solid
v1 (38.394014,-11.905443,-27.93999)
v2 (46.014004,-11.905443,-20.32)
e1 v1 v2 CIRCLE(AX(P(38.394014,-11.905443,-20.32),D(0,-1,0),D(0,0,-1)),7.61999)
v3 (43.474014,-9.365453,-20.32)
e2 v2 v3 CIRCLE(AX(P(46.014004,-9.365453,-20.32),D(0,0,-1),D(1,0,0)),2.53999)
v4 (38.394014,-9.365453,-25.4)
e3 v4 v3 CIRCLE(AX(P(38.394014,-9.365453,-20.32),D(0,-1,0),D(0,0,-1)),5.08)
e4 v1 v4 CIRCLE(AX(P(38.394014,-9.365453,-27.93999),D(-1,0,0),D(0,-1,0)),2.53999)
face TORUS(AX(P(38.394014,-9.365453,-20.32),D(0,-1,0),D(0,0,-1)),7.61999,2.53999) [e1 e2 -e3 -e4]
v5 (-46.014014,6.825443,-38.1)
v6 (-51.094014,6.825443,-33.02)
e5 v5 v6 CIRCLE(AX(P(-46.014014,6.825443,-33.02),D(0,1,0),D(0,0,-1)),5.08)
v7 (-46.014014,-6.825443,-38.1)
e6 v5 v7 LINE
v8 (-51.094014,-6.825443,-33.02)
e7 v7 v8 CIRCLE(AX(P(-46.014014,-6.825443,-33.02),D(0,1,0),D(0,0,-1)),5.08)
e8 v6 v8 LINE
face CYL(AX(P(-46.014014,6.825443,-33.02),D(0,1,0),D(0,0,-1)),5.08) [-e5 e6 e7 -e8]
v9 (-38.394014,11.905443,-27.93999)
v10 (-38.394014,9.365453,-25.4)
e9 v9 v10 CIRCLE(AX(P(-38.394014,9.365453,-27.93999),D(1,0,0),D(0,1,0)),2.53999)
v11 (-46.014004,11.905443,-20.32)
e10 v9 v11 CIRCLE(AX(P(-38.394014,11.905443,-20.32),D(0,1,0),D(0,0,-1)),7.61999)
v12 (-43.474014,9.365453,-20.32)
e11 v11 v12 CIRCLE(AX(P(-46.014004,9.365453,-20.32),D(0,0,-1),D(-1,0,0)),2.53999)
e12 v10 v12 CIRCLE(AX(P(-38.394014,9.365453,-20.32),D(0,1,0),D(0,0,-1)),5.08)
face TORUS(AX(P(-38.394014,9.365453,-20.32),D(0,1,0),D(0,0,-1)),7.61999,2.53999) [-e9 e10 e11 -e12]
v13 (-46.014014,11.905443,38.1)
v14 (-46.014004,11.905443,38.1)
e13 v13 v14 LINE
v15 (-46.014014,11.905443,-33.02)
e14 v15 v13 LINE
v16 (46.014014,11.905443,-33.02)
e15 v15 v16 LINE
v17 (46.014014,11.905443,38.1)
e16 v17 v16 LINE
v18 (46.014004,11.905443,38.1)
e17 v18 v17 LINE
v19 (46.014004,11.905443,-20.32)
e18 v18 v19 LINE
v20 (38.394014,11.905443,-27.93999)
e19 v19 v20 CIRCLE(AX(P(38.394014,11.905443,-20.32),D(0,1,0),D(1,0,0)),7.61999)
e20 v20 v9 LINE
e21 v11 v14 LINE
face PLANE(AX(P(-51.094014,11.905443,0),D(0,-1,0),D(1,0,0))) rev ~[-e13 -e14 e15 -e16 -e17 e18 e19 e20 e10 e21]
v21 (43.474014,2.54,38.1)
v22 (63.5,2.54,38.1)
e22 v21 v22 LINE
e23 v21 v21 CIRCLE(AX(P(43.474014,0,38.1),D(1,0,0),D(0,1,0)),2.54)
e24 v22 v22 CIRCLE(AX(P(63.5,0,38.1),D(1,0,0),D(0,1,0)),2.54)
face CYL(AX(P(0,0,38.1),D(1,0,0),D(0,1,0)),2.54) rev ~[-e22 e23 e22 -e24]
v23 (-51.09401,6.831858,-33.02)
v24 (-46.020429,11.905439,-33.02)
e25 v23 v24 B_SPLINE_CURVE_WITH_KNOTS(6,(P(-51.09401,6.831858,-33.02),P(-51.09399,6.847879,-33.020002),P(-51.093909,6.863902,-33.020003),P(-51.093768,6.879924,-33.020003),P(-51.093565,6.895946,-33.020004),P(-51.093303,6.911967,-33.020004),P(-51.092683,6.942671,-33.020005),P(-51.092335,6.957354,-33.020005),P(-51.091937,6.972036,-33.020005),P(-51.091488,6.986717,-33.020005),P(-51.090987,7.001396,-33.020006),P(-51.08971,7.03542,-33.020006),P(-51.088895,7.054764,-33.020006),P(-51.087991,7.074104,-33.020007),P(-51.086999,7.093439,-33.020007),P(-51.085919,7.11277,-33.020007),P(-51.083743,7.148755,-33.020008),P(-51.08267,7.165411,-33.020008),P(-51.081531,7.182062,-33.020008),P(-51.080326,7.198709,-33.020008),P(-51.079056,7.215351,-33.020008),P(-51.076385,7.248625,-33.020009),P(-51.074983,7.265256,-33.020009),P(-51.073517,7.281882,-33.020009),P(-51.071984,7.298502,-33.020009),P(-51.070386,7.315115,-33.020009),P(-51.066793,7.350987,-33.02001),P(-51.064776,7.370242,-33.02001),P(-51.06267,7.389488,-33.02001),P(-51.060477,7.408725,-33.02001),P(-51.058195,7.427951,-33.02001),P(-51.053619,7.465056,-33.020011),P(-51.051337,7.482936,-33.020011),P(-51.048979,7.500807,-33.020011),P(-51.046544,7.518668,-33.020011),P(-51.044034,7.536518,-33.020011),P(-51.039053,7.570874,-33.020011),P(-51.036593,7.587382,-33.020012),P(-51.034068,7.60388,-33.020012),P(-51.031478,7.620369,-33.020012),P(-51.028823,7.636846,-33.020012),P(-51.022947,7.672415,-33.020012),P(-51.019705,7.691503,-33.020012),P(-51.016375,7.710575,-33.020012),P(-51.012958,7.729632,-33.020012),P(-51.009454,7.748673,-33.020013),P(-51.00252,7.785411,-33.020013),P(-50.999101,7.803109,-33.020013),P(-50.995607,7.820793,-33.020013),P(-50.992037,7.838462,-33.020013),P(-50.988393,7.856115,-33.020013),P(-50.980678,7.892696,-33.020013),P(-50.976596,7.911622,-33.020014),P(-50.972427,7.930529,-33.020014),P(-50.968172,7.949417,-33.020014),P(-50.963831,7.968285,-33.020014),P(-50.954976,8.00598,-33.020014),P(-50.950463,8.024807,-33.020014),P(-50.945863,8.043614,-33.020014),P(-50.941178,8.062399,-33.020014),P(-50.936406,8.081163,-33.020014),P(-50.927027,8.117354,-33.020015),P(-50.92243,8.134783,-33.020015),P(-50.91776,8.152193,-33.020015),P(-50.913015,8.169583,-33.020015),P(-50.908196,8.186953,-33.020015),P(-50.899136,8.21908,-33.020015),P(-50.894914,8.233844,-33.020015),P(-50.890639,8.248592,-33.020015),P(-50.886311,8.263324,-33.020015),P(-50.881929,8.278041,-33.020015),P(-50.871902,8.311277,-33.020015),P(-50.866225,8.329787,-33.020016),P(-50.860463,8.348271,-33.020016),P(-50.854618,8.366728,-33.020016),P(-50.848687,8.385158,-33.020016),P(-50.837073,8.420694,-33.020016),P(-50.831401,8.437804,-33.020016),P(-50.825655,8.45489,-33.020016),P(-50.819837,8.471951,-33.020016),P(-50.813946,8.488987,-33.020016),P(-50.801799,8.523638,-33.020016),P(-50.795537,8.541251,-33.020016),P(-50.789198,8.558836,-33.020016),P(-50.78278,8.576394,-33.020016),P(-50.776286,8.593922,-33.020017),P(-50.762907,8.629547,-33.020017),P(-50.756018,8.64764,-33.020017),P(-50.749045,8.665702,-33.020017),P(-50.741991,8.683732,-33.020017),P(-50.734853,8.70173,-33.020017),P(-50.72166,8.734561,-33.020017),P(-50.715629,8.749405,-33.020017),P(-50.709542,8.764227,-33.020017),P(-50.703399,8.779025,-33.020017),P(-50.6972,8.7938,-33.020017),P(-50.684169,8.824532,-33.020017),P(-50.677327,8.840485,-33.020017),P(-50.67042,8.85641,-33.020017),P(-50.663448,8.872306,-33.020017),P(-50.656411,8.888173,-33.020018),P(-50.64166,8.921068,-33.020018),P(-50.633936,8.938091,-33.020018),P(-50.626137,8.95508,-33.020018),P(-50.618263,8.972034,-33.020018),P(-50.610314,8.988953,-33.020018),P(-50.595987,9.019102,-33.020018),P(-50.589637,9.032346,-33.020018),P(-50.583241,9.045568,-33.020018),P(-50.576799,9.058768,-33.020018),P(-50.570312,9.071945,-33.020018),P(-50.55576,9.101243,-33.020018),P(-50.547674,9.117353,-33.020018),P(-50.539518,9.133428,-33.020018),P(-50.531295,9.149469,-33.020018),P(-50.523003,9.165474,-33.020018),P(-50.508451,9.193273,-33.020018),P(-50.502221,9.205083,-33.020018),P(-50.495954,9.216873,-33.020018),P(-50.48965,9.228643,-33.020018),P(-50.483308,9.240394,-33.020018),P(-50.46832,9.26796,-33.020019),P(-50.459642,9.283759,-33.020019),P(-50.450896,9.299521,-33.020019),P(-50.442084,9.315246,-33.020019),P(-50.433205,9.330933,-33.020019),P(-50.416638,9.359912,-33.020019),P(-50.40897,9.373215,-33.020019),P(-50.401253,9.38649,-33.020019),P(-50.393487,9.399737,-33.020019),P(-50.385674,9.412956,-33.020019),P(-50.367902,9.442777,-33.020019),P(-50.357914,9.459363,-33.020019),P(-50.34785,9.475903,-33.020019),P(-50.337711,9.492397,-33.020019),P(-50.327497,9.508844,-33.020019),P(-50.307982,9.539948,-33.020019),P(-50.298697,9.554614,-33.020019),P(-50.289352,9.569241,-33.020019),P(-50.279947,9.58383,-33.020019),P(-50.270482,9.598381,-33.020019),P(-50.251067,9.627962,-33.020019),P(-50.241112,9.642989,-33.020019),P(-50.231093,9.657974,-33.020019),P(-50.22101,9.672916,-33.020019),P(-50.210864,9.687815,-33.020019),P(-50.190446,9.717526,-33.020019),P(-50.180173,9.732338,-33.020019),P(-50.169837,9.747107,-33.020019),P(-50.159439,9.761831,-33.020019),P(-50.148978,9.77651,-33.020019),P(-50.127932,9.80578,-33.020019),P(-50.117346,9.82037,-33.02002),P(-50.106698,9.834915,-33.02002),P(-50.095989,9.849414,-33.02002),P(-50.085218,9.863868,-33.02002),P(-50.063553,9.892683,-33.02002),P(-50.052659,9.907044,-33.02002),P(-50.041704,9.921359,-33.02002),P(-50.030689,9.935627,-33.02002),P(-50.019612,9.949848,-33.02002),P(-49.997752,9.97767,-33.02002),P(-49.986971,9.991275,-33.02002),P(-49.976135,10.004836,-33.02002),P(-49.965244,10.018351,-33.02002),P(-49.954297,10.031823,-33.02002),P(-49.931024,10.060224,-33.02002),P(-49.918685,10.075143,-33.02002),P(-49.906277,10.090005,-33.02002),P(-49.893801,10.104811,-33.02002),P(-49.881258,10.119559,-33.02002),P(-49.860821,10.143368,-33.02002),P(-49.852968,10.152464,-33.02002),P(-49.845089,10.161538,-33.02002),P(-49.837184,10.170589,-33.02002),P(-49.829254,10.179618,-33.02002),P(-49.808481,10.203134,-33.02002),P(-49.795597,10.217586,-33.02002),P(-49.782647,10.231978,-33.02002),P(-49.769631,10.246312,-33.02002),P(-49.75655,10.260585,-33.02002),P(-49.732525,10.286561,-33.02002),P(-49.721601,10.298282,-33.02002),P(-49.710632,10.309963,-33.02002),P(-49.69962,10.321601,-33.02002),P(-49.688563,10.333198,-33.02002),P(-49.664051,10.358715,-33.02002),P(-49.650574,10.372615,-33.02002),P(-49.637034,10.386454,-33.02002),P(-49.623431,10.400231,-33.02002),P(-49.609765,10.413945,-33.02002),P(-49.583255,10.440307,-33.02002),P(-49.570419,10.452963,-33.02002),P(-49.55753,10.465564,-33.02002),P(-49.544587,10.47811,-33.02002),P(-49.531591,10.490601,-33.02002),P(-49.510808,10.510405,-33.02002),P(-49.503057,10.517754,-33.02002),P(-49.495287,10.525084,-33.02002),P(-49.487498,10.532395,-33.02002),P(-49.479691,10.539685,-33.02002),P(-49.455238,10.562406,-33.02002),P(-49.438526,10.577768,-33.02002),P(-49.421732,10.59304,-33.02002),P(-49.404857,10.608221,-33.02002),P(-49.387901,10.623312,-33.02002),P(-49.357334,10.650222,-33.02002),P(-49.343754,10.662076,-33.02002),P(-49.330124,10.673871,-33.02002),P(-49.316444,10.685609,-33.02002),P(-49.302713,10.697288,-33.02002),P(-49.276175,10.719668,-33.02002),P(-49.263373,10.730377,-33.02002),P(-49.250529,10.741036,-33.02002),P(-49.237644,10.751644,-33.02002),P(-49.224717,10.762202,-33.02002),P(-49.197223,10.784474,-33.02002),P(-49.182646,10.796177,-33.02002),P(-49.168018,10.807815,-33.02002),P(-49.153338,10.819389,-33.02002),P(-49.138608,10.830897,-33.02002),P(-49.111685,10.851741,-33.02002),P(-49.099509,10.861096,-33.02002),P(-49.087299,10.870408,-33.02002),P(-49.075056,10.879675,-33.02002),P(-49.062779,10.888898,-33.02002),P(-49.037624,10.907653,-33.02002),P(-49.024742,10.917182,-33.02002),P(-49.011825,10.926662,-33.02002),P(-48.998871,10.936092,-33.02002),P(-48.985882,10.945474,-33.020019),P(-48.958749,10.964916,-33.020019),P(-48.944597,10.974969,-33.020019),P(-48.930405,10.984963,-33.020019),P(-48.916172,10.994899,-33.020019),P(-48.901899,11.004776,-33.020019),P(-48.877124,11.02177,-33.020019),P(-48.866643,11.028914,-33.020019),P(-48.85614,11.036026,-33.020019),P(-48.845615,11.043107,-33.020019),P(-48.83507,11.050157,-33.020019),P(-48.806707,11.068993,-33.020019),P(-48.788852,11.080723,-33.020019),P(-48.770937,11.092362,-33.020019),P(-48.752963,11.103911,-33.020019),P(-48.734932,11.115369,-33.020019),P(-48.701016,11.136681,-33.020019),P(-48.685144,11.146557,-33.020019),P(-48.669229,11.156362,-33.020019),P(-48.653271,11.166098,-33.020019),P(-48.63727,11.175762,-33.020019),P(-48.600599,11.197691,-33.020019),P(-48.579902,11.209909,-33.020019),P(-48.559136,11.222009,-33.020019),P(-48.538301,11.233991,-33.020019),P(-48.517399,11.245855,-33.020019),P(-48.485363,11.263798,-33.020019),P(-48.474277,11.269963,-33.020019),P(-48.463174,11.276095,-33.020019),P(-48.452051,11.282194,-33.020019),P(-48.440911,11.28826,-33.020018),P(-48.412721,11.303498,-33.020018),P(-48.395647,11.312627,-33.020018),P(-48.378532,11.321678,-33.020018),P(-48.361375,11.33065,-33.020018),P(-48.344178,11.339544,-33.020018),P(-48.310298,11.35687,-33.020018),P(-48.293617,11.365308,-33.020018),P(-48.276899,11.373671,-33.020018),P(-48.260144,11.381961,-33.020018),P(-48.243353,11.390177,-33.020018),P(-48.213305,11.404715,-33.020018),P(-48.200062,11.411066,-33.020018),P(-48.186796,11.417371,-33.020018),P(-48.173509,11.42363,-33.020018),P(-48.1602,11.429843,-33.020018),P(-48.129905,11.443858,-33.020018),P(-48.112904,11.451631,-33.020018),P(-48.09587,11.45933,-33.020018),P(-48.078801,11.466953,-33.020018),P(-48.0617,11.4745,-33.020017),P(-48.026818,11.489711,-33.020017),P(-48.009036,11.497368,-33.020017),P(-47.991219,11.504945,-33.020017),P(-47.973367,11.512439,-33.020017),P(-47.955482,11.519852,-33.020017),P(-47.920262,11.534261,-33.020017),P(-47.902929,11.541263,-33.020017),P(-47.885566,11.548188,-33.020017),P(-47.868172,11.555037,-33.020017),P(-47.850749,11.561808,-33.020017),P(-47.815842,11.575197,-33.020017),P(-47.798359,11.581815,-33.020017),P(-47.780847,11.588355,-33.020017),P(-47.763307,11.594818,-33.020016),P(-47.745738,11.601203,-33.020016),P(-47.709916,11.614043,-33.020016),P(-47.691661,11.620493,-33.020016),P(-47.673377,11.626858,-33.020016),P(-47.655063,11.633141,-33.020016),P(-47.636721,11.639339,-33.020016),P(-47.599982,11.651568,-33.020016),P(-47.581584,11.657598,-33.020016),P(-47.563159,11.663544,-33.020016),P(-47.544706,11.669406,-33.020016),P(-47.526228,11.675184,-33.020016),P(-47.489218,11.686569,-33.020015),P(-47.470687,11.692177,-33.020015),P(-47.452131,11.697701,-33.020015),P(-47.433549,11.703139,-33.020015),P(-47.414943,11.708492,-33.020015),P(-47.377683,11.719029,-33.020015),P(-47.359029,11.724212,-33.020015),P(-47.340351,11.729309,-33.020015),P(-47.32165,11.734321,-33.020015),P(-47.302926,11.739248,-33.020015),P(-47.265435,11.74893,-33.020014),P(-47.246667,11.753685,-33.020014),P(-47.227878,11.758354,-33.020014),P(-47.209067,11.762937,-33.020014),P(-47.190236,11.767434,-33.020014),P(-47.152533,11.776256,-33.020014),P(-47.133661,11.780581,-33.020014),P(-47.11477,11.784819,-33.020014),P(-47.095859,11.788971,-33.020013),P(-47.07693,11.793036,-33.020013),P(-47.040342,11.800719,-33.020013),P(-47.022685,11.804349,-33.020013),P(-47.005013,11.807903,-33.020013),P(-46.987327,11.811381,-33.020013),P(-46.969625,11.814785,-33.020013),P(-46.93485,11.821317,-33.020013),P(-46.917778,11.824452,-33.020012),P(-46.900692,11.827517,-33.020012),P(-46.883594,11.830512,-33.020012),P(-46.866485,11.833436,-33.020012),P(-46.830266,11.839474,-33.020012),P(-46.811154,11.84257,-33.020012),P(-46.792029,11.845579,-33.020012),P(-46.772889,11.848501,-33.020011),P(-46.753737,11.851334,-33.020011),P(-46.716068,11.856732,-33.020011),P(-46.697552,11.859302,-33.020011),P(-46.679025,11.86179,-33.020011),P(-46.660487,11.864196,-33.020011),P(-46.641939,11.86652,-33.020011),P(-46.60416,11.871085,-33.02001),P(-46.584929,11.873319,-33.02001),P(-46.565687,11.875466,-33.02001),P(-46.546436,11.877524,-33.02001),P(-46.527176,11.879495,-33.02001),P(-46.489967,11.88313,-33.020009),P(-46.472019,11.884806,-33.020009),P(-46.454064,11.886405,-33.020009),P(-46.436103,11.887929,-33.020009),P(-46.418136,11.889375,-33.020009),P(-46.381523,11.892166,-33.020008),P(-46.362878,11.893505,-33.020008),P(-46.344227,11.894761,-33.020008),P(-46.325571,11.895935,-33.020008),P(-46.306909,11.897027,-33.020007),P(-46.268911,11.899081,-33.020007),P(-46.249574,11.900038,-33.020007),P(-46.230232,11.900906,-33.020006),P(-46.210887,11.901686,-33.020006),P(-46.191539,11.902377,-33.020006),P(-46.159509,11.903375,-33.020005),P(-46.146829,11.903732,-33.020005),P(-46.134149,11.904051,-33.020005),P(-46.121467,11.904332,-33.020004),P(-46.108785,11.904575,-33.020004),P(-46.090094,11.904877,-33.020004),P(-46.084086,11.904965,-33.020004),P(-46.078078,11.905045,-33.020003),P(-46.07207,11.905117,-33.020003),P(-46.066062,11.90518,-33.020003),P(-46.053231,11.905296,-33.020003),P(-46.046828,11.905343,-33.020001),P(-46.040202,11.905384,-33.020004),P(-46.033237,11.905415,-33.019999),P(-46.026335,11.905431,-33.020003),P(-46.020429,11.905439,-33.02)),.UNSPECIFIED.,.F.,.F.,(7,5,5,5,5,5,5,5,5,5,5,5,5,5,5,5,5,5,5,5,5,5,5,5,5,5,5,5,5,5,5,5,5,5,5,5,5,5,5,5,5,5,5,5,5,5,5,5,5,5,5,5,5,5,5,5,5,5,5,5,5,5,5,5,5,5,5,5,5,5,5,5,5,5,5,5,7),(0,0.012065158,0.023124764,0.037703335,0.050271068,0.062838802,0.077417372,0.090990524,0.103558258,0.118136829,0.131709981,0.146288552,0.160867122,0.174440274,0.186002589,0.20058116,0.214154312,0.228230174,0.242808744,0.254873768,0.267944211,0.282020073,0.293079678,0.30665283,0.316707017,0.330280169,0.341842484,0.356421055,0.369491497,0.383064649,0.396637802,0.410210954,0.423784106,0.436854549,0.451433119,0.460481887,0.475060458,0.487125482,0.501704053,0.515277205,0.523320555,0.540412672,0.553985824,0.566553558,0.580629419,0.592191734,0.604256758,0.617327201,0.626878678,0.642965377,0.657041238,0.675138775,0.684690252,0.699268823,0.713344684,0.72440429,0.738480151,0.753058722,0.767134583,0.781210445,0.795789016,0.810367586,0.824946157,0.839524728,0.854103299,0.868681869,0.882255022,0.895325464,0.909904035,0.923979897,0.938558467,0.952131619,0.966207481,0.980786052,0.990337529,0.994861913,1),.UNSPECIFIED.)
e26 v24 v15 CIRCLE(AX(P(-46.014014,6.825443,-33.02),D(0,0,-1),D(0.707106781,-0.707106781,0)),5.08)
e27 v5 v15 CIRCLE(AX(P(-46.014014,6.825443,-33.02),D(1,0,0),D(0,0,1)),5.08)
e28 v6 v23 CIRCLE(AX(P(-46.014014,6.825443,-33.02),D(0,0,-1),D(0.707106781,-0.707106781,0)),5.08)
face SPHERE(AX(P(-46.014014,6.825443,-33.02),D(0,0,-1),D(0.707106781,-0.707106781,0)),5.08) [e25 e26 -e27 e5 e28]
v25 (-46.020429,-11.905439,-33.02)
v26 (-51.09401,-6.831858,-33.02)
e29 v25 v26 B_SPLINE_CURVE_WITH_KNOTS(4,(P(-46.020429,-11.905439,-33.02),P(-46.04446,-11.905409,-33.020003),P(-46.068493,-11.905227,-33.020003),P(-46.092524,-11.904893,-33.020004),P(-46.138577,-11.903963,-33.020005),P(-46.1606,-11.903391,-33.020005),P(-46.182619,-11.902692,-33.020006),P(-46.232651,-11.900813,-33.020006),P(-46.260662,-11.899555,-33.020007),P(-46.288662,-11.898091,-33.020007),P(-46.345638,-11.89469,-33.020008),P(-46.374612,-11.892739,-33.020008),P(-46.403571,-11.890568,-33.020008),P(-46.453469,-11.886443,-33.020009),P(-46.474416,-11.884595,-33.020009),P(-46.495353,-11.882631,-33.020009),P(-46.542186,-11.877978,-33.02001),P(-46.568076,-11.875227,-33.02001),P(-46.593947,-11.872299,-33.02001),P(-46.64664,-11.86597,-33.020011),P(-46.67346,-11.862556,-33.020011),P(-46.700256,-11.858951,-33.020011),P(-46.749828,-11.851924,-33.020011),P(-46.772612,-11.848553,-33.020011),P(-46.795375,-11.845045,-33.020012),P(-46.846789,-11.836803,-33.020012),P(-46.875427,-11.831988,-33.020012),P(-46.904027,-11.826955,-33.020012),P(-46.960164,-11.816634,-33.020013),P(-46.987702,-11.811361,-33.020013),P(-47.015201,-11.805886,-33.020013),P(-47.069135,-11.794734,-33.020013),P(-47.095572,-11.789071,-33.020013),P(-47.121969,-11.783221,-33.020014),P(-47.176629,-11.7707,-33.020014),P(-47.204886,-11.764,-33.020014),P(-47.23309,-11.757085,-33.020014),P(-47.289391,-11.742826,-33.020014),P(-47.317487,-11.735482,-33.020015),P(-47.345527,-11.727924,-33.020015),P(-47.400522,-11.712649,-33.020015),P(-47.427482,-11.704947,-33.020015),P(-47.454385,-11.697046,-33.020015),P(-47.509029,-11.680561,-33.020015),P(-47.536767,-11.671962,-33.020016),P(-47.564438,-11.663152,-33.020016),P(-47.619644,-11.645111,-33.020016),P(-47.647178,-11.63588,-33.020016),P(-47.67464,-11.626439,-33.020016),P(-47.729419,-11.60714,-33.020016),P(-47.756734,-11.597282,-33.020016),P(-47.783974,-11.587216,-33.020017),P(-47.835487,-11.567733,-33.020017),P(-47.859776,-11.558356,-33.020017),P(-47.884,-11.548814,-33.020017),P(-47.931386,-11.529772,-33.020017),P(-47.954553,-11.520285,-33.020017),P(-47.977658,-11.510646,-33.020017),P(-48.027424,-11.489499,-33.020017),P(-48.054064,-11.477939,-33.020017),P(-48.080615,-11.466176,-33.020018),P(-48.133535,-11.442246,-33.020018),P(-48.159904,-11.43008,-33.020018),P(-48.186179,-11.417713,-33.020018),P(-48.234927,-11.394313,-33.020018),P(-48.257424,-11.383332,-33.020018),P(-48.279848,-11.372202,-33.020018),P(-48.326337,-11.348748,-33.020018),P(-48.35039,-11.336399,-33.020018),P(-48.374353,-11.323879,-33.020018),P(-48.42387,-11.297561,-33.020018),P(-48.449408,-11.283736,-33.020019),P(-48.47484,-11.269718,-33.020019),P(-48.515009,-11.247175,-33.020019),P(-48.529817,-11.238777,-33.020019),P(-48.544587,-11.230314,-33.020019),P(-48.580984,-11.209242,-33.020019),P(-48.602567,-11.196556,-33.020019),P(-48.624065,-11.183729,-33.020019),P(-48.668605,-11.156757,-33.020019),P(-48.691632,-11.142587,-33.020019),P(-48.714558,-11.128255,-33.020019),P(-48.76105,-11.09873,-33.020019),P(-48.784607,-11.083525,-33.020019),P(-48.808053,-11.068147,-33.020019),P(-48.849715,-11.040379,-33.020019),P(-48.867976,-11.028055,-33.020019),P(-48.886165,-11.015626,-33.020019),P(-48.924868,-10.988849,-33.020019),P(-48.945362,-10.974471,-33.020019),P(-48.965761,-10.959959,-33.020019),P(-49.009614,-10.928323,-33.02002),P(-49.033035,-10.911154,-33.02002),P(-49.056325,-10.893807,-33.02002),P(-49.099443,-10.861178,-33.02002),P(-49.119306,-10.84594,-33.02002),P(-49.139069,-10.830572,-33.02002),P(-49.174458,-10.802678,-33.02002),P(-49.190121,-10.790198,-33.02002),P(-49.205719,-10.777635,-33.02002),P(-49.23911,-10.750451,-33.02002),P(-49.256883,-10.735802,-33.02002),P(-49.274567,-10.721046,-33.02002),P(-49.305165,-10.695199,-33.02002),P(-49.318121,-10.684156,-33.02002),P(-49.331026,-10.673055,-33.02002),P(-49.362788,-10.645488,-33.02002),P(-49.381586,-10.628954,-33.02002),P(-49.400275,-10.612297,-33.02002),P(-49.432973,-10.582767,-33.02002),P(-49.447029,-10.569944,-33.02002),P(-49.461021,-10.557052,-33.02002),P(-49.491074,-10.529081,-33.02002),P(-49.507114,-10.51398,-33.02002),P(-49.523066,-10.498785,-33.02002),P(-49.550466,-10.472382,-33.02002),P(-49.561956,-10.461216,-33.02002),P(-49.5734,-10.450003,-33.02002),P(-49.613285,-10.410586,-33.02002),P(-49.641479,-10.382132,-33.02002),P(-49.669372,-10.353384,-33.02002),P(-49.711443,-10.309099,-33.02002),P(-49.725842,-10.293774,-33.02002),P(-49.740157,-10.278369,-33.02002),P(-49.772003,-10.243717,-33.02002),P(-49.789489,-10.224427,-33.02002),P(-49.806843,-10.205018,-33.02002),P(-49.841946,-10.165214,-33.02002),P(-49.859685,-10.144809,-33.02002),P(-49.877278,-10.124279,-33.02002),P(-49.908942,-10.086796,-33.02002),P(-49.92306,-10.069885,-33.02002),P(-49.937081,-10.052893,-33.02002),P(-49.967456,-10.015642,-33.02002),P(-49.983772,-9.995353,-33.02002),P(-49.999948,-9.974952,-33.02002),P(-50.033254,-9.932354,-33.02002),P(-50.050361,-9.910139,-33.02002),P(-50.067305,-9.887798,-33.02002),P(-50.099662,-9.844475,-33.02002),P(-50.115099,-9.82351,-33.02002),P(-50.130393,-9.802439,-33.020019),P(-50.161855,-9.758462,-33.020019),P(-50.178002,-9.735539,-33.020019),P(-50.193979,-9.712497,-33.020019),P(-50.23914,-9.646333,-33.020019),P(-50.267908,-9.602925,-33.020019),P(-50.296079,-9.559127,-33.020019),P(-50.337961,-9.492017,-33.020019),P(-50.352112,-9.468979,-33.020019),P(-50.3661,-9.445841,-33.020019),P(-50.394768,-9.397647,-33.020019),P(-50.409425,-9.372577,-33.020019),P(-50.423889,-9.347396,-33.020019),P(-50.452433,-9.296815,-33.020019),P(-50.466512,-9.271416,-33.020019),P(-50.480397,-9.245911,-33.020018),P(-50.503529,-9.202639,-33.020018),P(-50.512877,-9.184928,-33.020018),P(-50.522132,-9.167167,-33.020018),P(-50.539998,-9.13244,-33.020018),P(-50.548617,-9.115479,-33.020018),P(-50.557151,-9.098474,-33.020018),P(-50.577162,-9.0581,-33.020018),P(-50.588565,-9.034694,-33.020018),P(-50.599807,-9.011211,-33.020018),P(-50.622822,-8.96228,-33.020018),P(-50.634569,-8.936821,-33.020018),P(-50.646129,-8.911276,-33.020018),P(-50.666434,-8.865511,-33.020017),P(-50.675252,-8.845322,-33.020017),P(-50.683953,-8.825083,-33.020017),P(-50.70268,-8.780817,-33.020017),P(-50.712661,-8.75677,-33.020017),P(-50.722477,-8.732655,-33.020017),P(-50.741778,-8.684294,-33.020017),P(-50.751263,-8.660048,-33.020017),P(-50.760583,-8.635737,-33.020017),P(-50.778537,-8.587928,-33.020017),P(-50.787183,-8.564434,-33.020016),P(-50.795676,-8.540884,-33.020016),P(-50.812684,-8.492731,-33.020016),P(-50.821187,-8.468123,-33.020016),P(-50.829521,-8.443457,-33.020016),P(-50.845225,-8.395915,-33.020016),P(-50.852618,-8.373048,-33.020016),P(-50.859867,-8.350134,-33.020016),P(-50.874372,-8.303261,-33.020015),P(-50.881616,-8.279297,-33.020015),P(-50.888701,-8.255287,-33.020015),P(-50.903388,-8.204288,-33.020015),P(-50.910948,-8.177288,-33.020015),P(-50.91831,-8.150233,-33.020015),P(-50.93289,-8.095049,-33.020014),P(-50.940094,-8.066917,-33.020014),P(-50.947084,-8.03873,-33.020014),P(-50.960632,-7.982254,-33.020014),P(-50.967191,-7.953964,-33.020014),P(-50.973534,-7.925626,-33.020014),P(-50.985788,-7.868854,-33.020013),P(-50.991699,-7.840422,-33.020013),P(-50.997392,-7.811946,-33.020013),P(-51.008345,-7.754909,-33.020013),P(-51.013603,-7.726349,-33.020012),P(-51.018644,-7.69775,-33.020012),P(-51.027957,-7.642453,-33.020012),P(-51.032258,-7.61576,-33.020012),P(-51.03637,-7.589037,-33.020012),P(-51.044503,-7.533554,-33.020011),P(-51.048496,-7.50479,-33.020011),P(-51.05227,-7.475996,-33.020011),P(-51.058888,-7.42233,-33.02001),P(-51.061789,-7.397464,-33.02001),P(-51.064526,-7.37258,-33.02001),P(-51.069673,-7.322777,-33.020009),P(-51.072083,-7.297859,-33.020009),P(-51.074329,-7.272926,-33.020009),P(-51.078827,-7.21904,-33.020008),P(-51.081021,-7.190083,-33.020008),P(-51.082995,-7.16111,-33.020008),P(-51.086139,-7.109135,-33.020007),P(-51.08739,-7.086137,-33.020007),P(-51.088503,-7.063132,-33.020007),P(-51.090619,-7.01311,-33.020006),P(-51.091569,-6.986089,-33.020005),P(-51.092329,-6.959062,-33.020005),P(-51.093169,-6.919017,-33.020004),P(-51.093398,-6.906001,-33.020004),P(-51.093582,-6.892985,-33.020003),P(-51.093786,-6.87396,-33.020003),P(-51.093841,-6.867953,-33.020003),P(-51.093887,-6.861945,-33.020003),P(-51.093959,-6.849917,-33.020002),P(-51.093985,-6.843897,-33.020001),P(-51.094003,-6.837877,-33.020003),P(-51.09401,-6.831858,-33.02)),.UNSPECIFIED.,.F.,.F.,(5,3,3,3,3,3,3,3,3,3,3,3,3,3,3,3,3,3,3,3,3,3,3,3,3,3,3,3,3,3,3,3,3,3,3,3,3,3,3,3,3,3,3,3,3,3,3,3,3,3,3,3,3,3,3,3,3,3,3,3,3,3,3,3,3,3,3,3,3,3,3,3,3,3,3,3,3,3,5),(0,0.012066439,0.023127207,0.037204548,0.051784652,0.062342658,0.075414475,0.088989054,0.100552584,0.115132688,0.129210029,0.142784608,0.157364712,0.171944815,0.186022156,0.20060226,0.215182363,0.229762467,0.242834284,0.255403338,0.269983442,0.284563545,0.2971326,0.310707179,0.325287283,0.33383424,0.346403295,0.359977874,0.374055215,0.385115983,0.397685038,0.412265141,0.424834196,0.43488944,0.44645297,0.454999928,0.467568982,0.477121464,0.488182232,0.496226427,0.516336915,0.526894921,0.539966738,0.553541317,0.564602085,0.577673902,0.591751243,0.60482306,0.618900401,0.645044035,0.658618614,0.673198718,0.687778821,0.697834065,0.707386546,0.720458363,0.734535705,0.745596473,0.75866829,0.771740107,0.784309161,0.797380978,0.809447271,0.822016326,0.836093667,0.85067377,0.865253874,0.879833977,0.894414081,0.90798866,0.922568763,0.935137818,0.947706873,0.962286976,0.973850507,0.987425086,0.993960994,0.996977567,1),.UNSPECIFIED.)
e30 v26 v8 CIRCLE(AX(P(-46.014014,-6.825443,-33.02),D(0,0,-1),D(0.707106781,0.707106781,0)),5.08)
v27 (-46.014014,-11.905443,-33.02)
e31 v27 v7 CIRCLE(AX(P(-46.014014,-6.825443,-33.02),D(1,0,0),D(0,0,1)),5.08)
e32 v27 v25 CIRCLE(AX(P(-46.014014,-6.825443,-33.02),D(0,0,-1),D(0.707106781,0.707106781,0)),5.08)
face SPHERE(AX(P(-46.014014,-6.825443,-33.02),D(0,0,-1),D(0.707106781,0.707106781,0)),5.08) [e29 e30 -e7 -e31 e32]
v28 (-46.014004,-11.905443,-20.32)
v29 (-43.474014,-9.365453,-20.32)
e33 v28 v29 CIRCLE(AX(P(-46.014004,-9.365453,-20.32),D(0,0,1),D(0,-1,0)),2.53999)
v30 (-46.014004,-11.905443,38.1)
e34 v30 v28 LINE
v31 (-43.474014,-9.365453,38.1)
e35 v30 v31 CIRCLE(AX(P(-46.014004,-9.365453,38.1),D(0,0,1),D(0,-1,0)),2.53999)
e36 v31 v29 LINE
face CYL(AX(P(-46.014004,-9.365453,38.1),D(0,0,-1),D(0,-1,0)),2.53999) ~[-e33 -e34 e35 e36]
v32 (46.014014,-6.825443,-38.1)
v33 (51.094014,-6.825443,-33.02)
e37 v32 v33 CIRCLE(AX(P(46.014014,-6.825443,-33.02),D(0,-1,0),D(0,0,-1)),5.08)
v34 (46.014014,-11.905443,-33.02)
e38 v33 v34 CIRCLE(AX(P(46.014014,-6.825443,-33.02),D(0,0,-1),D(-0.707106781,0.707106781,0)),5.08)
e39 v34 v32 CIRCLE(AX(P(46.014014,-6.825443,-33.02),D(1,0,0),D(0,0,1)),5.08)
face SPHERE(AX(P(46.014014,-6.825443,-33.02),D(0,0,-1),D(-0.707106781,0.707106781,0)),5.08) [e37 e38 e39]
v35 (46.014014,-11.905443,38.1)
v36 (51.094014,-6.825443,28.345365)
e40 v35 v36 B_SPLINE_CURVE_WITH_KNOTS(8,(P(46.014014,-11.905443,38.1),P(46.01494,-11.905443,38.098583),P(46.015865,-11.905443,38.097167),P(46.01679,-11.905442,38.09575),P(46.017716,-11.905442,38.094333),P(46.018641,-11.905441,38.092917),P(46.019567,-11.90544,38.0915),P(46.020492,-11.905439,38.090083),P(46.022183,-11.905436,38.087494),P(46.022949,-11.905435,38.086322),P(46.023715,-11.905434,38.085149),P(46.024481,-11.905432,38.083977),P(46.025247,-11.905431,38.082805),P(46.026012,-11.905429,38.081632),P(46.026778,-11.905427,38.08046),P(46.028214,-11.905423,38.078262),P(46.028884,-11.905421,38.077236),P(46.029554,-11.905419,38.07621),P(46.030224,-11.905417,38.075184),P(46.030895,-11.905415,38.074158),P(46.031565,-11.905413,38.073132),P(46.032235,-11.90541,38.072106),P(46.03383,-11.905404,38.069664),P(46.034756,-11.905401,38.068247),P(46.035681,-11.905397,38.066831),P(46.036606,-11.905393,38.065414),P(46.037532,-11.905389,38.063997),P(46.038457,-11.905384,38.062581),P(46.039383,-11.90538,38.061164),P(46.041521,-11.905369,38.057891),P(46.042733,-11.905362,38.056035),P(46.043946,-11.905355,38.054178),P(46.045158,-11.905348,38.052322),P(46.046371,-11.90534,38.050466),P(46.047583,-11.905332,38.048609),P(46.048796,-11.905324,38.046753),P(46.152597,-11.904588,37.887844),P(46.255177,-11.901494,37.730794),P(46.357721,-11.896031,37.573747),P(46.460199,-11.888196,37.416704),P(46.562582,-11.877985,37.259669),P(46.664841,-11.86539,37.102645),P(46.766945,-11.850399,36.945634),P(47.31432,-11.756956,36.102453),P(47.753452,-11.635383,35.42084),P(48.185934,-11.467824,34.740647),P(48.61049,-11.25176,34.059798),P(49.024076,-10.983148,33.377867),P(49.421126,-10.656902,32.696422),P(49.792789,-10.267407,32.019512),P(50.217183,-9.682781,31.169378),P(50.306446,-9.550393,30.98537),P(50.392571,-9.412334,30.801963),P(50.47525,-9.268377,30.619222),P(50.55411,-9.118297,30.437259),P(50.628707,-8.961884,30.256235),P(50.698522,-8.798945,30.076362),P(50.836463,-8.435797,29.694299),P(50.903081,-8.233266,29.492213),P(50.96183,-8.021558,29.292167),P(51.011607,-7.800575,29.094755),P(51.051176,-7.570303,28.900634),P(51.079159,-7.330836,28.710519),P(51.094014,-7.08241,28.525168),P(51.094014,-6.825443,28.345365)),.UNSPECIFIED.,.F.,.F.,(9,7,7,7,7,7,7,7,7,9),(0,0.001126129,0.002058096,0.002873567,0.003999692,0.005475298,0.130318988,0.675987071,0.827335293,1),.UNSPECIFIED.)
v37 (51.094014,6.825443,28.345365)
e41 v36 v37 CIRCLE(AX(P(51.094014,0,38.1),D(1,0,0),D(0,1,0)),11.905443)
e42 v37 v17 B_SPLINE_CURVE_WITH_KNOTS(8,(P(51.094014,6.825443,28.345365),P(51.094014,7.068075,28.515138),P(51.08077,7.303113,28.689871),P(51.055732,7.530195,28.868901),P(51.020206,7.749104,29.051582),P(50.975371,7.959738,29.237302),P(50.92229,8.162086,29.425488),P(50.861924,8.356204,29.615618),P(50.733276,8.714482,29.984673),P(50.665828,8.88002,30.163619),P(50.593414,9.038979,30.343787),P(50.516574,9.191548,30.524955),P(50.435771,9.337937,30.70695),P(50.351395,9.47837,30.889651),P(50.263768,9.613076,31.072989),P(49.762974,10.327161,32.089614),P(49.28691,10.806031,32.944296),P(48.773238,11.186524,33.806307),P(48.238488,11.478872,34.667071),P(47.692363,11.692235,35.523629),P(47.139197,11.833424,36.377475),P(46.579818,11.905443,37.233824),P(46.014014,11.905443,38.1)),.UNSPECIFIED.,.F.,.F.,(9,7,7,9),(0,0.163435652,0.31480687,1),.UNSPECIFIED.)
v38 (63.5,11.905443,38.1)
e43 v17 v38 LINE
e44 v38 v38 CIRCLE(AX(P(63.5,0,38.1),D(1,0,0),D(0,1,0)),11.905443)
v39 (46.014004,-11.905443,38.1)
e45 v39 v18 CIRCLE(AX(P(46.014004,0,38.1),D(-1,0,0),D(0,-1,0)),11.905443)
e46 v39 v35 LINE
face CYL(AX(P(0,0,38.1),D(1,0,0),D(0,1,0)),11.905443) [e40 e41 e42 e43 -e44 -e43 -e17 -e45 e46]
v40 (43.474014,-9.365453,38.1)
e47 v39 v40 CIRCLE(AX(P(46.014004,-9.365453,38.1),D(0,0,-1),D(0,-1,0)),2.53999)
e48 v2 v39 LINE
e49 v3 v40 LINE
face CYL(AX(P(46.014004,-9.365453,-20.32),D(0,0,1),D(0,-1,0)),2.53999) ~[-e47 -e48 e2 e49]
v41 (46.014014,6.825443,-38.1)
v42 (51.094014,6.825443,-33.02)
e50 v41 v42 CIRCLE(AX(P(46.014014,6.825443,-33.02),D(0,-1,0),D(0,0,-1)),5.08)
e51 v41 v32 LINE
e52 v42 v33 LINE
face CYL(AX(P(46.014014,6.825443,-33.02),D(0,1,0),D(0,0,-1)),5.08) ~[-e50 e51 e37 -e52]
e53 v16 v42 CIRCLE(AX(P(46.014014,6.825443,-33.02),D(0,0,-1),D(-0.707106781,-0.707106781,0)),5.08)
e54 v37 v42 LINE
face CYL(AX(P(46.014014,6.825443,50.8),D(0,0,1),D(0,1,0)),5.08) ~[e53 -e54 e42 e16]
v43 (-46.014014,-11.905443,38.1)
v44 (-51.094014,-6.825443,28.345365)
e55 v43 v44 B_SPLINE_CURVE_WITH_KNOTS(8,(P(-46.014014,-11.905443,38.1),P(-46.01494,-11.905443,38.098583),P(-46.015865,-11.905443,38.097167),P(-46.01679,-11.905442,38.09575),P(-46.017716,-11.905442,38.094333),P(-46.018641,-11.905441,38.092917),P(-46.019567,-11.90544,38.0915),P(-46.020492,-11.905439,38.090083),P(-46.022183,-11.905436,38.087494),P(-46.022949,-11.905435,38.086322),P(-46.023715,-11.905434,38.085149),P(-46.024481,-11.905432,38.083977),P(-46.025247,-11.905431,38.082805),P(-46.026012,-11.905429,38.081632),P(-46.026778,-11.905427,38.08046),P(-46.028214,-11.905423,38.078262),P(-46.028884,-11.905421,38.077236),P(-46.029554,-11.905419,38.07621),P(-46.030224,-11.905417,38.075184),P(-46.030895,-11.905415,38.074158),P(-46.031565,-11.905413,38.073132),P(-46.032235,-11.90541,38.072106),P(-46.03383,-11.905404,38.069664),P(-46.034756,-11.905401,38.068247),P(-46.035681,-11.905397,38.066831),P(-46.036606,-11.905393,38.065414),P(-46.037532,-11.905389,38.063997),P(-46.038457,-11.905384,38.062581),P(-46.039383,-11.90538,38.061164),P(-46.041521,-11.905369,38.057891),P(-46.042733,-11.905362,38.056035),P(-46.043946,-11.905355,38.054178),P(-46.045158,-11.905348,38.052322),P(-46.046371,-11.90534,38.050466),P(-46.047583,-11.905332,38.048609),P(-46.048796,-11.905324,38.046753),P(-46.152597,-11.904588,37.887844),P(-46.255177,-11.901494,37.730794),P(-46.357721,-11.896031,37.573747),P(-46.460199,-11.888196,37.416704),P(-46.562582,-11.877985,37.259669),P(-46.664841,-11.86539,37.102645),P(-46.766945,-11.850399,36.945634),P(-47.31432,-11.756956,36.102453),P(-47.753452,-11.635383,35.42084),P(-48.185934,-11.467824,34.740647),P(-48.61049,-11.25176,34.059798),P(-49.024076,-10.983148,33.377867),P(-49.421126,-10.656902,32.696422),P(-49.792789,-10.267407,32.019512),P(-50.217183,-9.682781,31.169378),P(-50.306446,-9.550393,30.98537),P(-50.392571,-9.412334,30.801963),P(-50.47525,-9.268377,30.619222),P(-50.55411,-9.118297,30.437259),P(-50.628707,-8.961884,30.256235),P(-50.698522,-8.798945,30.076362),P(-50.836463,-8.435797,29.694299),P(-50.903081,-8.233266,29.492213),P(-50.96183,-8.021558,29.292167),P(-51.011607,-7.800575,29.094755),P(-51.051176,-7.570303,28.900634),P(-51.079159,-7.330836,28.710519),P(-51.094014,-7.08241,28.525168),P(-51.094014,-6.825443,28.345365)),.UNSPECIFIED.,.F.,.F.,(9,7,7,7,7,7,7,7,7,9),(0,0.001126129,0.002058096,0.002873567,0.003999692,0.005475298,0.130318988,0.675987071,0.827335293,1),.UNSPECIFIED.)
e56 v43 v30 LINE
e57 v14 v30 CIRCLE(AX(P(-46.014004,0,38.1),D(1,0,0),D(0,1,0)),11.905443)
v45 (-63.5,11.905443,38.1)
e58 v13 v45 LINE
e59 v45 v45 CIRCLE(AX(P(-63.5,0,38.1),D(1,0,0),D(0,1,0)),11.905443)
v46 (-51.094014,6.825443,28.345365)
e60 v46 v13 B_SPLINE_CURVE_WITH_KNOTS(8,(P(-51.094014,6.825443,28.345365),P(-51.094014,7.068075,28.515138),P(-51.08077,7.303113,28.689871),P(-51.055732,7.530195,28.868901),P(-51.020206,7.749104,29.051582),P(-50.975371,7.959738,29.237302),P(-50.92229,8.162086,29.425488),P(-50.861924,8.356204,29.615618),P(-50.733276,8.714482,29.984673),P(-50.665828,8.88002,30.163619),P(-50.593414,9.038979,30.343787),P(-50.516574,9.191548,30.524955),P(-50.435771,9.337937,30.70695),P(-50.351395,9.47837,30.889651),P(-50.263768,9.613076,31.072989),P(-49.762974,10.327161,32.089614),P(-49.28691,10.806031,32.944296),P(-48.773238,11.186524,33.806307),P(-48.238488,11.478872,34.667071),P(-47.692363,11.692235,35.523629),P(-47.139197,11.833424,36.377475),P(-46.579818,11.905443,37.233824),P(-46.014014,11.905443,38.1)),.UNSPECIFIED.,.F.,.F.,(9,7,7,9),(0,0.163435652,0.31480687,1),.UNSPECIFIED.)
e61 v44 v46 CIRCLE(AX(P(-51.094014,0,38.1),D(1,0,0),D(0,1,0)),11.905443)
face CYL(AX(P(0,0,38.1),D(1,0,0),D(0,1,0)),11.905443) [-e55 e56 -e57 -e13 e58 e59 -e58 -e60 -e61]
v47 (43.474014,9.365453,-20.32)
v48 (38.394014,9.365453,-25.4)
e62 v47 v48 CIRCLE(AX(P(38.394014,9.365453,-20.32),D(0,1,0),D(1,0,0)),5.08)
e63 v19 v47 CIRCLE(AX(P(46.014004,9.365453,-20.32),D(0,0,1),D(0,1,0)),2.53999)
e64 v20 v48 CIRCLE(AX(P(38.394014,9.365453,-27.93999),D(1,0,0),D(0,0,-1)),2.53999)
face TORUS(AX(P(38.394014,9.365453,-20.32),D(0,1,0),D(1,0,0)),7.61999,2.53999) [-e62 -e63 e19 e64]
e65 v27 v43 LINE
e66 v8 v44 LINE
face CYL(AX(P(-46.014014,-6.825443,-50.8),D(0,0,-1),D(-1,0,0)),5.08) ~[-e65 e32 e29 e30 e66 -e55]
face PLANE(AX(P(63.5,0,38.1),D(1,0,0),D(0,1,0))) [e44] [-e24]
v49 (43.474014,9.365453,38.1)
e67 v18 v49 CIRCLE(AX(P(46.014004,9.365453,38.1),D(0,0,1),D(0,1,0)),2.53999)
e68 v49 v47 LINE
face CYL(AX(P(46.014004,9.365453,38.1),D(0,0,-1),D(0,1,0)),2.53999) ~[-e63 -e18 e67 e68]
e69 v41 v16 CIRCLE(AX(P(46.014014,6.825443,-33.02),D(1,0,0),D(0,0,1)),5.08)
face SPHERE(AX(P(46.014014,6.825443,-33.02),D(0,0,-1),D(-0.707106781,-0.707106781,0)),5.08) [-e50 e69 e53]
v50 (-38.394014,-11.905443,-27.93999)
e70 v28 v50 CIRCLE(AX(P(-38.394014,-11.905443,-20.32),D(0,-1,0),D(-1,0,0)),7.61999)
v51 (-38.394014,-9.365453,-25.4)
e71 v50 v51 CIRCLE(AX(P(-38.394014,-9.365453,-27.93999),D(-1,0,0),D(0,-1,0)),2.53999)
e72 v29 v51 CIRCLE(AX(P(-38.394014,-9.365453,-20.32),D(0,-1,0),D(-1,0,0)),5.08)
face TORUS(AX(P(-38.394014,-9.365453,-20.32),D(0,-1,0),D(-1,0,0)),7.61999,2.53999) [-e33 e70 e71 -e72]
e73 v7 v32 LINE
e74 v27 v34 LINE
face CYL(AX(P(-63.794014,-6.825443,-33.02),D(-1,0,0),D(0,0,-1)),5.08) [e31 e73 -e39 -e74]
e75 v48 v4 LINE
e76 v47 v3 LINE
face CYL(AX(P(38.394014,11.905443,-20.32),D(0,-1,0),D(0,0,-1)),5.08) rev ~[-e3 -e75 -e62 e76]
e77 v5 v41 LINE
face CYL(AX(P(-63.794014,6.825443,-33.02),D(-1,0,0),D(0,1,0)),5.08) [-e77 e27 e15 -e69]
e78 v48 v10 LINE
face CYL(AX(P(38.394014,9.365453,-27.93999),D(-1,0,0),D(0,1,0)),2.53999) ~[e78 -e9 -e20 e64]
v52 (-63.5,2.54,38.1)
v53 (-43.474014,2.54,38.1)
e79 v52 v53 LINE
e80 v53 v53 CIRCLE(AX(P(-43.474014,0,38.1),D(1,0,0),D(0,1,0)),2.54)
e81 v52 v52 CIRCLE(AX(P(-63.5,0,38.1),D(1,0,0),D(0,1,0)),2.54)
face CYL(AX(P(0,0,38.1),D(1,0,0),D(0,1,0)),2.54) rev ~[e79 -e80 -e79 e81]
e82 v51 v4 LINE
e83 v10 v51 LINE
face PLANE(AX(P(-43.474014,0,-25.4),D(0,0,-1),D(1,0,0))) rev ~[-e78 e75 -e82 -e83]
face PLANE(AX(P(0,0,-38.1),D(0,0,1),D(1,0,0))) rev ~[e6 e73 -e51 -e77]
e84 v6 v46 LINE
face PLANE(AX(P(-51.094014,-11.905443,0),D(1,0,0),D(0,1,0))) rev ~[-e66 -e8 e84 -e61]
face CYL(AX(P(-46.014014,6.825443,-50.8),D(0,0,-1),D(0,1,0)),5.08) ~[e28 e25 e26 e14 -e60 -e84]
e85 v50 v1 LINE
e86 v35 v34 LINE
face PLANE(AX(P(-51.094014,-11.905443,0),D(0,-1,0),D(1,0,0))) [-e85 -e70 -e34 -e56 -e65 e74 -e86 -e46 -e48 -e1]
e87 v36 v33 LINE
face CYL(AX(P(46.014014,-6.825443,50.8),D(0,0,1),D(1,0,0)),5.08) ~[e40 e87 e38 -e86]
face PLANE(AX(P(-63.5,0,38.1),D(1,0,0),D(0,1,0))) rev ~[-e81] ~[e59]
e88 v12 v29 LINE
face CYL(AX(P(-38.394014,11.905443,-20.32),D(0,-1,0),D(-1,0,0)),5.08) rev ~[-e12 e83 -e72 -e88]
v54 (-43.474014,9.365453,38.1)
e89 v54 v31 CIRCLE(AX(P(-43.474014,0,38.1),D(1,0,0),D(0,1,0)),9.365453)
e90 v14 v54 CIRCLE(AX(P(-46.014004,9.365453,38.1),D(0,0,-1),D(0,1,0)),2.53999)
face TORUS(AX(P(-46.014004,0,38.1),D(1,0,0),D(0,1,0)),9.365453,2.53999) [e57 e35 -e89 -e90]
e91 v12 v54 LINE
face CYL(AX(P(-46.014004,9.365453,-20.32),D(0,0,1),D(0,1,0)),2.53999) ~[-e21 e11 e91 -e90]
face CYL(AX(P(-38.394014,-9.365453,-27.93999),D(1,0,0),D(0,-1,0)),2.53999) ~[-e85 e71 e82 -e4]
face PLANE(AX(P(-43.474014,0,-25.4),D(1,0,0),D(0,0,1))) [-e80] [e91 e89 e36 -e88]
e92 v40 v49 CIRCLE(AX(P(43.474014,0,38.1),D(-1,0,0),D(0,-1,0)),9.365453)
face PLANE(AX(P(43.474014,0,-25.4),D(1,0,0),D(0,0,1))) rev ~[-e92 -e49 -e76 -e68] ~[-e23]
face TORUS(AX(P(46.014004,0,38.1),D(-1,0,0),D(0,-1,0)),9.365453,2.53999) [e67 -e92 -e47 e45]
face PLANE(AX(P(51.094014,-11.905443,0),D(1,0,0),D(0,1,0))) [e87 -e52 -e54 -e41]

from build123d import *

# Parameters (mm, degrees)
F0_W          = 102.1880283952
F0_H          = 23.8108858466
F1_DEPTH      = 38.1
F2_R          = 11.9054429233
F3_DEPTH      = 63.5
F4_W          = 86.9480283952
F4_H          = 88.2315921943
F5_DEPTH      = 25.4
F6_R          = 2.54
F7_DEPTH      = 63.5
F8_T1_DEPTH   = 127.5880283952
F8_T6_DEPTH   = 101.6
F8_S7_R       = 11.9054429233
F8_T8_DEPTH   = 52
F8_T12_DEPTH  = 101.6
F8_S13_R      = 11.9054429233
F8_T14_DEPTH  = 52
F9_T1_DEPTH   = 127.5880283952
F9_T6_DEPTH   = 101.6
F9_S7_R       = 11.9054429233
F9_T8_DEPTH   = 52
F9_T12_DEPTH  = 101.6
F9_S13_R      = 11.9054429233
F9_T14_DEPTH  = 52
F10_T1_DEPTH  = 13.6508858466
F10_S5_W      = 5.08
F10_S5_H      = 5.08
F10_T6_DEPTH  = 5.08
F10_S11_W     = 5.08
F10_S11_H     = 5.08
F10_T12_DEPTH = 5.08
F10_S17_W     = 5.08
F10_S17_H     = 5.08
F10_T18_DEPTH = 5.08
F10_S23_W     = 5.08
F10_S23_H     = 5.08
F10_T24_DEPTH = 5.08
F11_R         = 5.08
F12_R         = 2.53999


# Not quite as in the source:
# - a fillet or chamfer that OpenCascade refuses, or shapes differently, is made with other operations: its cross-section is extruded or revolved along the edge and cut away or added
# - a fillet or chamfer is up to 0.001 mm smaller than in the source, because OpenCascade refuses the exact size


with BuildPart() as f1:
    # F0 (on Top) → F1 (new body, symmetric)
    with BuildSketch(Plane.XY):
        Rectangle(F0_W, F0_H)
    extrude(amount=F1_DEPTH, both=True)

    # F2 (on Right) → F3 (join, symmetric)
    with BuildSketch(Plane.YZ):
        with Locations((0, 38.1)):
            Circle(F2_R)
    extrude(amount=F3_DEPTH, both=True)

    # F4 (on Front) → F5 (cut, symmetric)
    with BuildSketch(Plane.XZ):
        with Locations((0, 18.7157960971)):
            Rectangle(F4_W, F4_H)
    extrude(amount=F5_DEPTH, both=True, mode=Mode.SUBTRACT)

    # F6 (on Right) → F7 (cut, symmetric)
    with BuildSketch(Plane.YZ):
        with Locations((0, 38.1)):
            Circle(F6_R)
    extrude(amount=F7_DEPTH, both=True, mode=Mode.SUBTRACT)

    # F8: fillet of radius 5.08 on 3 edges, made by hand

    # F8_s2 → F8_t1 (cut)
    with BuildSketch(Plane.YZ.offset(-63.7940141976)):
        with BuildLine():
            ThreePointArc((-6.8254429233, -38.1), (-10.4175453717, -36.6121024484), (-11.9054429233, -33.02))
            Line((-11.9054429233, -33.02), (-11.9054429233, -38.1))
            Line((-11.9054429233, -38.1), (-6.8254429233, -38.1))
        make_face()
    extrude(amount=F8_T1_DEPTH, mode=Mode.SUBTRACT)


with BuildPart() as f8_tool4:
    # F8_s5 → F8_t6 (new body)
    with BuildSketch(Plane.XY.offset(50.8)):
        with BuildLine():
            ThreePointArc((51.0940141976, -6.8254429233), (49.606116646, -10.4175453717), (46.0140141976, -11.9054429233))
            Line((46.0140141976, -11.9054429233), (51.0940141976, -11.9054429233))
            Line((51.0940141976, -11.9054429233), (51.0940141976, -6.8254429233))
        make_face()
    extrude(amount=-F8_T6_DEPTH)

    # F8_s7 → F8_t8 (cut, symmetric)
    with BuildSketch(Plane.YZ.offset(48.6)):
        with Locations((0, 38.1)):
            Circle(F8_S7_R)
    extrude(amount=F8_T8_DEPTH, both=True, mode=Mode.SUBTRACT)


with BuildPart() as f1_1:
    add(f1.part)

    # F8_t3: cut F8_tool4
    add(f8_tool4.part, mode=Mode.SUBTRACT)


with BuildPart() as f8_tool10:
    # F8_s11 → F8_t12 (new body)
    with BuildSketch(Plane.XY.offset(-50.8)):
        with BuildLine():
            ThreePointArc((-51.0940141976, -6.8254429233), (-49.606116646, -10.4175453717), (-46.0140141976, -11.9054429233))
            Line((-46.0140141976, -11.9054429233), (-51.0940141976, -11.9054429233))
            Line((-51.0940141976, -11.9054429233), (-51.0940141976, -6.8254429233))
        make_face()
    extrude(amount=F8_T12_DEPTH)

    # F8_s13 → F8_t14 (cut, symmetric)
    with BuildSketch(Plane.YZ.offset(-48.6)):
        with Locations((0, 38.1)):
            Circle(F8_S13_R)
    extrude(amount=F8_T14_DEPTH, both=True, mode=Mode.SUBTRACT)


with BuildPart() as f1_2:
    add(f1_1.part)

    # F8_t9: cut F8_tool10
    add(f8_tool10.part, mode=Mode.SUBTRACT)

    # F9: fillet of radius 5.08 on 3 edges, made by hand

    # F9_s2 → F9_t1 (cut)
    with BuildSketch(Plane.YZ.offset(-63.7940141976)):
        with BuildLine():
            ThreePointArc((11.9054429233, -33.02), (10.4175453717, -36.6121024484), (6.8254429233, -38.1))
            Line((6.8254429233, -38.1), (11.9054429233, -38.1))
            Line((11.9054429233, -38.1), (11.9054429233, -33.02))
        make_face()
    extrude(amount=F9_T1_DEPTH, mode=Mode.SUBTRACT)


with BuildPart() as f9_tool4:
    # F9_s5 → F9_t6 (new body)
    with BuildSketch(Plane.XY.offset(-50.8)):
        with BuildLine():
            ThreePointArc((-46.0140141976, 11.9054429233), (-49.606116646, 10.4175453717), (-51.0940141976, 6.8254429233))
            Line((-51.0940141976, 6.8254429233), (-51.0940141976, 11.9054429233))
            Line((-51.0940141976, 11.9054429233), (-46.0140141976, 11.9054429233))
        make_face()
    extrude(amount=F9_T6_DEPTH)

    # F9_s7 → F9_t8 (cut, symmetric)
    with BuildSketch(Plane.YZ.offset(-48.6)):
        with Locations((0, 38.1)):
            Circle(F9_S7_R)
    extrude(amount=F9_T8_DEPTH, both=True, mode=Mode.SUBTRACT)


with BuildPart() as f1_3:
    add(f1_2.part)

    # F9_t3: cut F9_tool4
    add(f9_tool4.part, mode=Mode.SUBTRACT)


with BuildPart() as f9_tool10:
    # F9_s11 → F9_t12 (new body)
    with BuildSketch(Plane.XY.offset(50.8)):
        with BuildLine():
            ThreePointArc((46.0140141976, 11.9054429233), (49.606116646, 10.4175453717), (51.0940141976, 6.8254429233))
            Line((51.0940141976, 6.8254429233), (51.0940141976, 11.9054429233))
            Line((51.0940141976, 11.9054429233), (46.0140141976, 11.9054429233))
        make_face()
    extrude(amount=-F9_T12_DEPTH)

    # F9_s13 → F9_t14 (cut, symmetric)
    with BuildSketch(Plane.YZ.offset(48.6)):
        with Locations((0, 38.1)):
            Circle(F9_S13_R)
    extrude(amount=F9_T14_DEPTH, both=True, mode=Mode.SUBTRACT)


with BuildPart() as f1_4:
    add(f1_3.part)

    # F9_t9: cut F9_tool10
    add(f9_tool10.part, mode=Mode.SUBTRACT)

    # F10: fillet of radius 5.08 on 2 edges, made by hand

    # F10_s2 → F10_t1 (cut)
    with BuildSketch(Plane.XZ.offset(-6.8254429233)):
        with BuildLine():
            ThreePointArc((-46.0140141976, -38.1), (-49.606116646, -36.6121024484), (-51.0940141976, -33.02))
            Line((-51.0940141976, -33.02), (-51.0940141976, -38.1))
            Line((-51.0940141976, -38.1), (-46.0140141976, -38.1))
        make_face()
        with BuildLine():
            ThreePointArc((46.0140141976, -38.1), (49.606116646, -36.6121024484), (51.0940141976, -33.02))
            Line((51.0940141976, -33.02), (51.0940141976, -38.1))
            Line((51.0940141976, -38.1), (46.0140141976, -38.1))
        make_face()
    extrude(amount=F10_T1_DEPTH, mode=Mode.SUBTRACT)


with BuildPart() as f10_tool4:
    # F10_s5 → F10_t6 (new body)
    with BuildSketch(Plane.XY.offset(-33.02)):
        with Locations((48.5540141976, -9.3654429233)):
            Rectangle(F10_S5_W, F10_S5_H)
    extrude(amount=-F10_T6_DEPTH)

    # F10_s7 → F10_t8 (revolve, cut)
    with BuildSketch(Plane(origin=(46.0140141976, -6.8254429233, -33.02), x_dir=(-0.7071067812, 0.7071067812, 0), z_dir=(-0.7071067812, -0.7071067812, 0))):
        with BuildLine():
            ThreePointArc((0, -5.08), (5.08, 0), (0, 5.08))
            Line((0, 5.08), (0, -5.08))
        make_face()
    revolve(axis=Axis((46.0140141976, -6.8254429233, -33.02), (0, 0, -1)), mode=Mode.SUBTRACT)


with BuildPart() as f1_5:
    add(f1_4.part)

    # F10_t3: cut F10_tool4
    add(f10_tool4.part, mode=Mode.SUBTRACT)


with BuildPart() as f10_tool10:
    # F10_s11 → F10_t12 (new body)
    with BuildSketch(Plane.XY.offset(-33.02)):
        with Locations((48.5540141976, 9.3654429233)):
            Rectangle(F10_S11_W, F10_S11_H)
    extrude(amount=-F10_T12_DEPTH)

    # F10_s13 → F10_t14 (revolve, cut)
    with BuildSketch(Plane(origin=(46.0140141976, 6.8254429233, -33.02), x_dir=(-0.7071067812, -0.7071067812, 0), z_dir=(0.7071067812, -0.7071067812, 0))):
        with BuildLine():
            ThreePointArc((0, -5.08), (5.08, 0), (0, 5.08))
            Line((0, 5.08), (0, -5.08))
        make_face()
    revolve(axis=Axis((46.0140141976, 6.8254429233, -33.02), (0, 0, -1)), mode=Mode.SUBTRACT)


with BuildPart() as f1_6:
    add(f1_5.part)

    # F10_t9: cut F10_tool10
    add(f10_tool10.part, mode=Mode.SUBTRACT)


with BuildPart() as f10_tool16:
    # F10_s17 → F10_t18 (new body)
    with BuildSketch(Plane.XY.offset(-33.02)):
        with Locations((-48.5540141976, 9.3654429233)):
            Rectangle(F10_S17_W, F10_S17_H)
    extrude(amount=-F10_T18_DEPTH)

    # F10_s19 → F10_t20 (revolve, cut)
    with BuildSketch(Plane(origin=(-46.0140141976, 6.8254429233, -33.02), x_dir=(0.7071067812, -0.7071067812, 0), z_dir=(0.7071067812, 0.7071067812, 0))):
        with BuildLine():
            ThreePointArc((0, -5.08), (5.08, 0), (0, 5.08))
            Line((0, 5.08), (0, -5.08))
        make_face()
    revolve(axis=Axis((-46.0140141976, 6.8254429233, -33.02), (0, 0, -1)), mode=Mode.SUBTRACT)


with BuildPart() as f1_7:
    add(f1_6.part)

    # F10_t15: cut F10_tool16
    add(f10_tool16.part, mode=Mode.SUBTRACT)


with BuildPart() as f10_tool22:
    # F10_s23 → F10_t24 (new body)
    with BuildSketch(Plane.XY.offset(-33.02)):
        with Locations((-48.5540141976, -9.3654429233)):
            Rectangle(F10_S23_W, F10_S23_H)
    extrude(amount=-F10_T24_DEPTH)

    # F10_s25 → F10_t26 (revolve, cut)
    with BuildSketch(Plane(origin=(-46.0140141976, -6.8254429233, -33.02), x_dir=(0.7071067812, 0.7071067812, 0), z_dir=(-0.7071067812, 0.7071067812, 0))):
        with BuildLine():
            ThreePointArc((0, -5.08), (5.08, 0), (0, 5.08))
            Line((0, 5.08), (0, -5.08))
        make_face()
    revolve(axis=Axis((-46.0140141976, -6.8254429233, -33.02), (0, 0, -1)), mode=Mode.SUBTRACT)


with BuildPart() as f1_8:
    add(f1_7.part)

    # F10_t21: cut F10_tool22
    add(f10_tool22.part, mode=Mode.SUBTRACT)

    # F11
    f11_edges = [f1_8.edges().sort_by_distance(p)[0] for p in [
        (-43.474014, 0, -25.4),
        (43.474014, 0, -25.4),
    ]]
    fillet(f11_edges, radius=F11_R)

    # F12 (radius 2.54 in the source; OpenCascade refuses exactly that, so slightly less here)
    f12_edges = [f1_8.edges().sort_by_distance(p)[0] for p in [
        (0, -11.905443, -25.4),
        (-43.474014, -11.905443, 8.89),
        (-41.986117, -11.905443, -23.912102),
        (41.986117, -11.905443, -23.912102),
        (43.474014, -11.905443, 8.89),
    ]]
    fillet(f12_edges, radius=F12_R)


solid = f1_8.part
